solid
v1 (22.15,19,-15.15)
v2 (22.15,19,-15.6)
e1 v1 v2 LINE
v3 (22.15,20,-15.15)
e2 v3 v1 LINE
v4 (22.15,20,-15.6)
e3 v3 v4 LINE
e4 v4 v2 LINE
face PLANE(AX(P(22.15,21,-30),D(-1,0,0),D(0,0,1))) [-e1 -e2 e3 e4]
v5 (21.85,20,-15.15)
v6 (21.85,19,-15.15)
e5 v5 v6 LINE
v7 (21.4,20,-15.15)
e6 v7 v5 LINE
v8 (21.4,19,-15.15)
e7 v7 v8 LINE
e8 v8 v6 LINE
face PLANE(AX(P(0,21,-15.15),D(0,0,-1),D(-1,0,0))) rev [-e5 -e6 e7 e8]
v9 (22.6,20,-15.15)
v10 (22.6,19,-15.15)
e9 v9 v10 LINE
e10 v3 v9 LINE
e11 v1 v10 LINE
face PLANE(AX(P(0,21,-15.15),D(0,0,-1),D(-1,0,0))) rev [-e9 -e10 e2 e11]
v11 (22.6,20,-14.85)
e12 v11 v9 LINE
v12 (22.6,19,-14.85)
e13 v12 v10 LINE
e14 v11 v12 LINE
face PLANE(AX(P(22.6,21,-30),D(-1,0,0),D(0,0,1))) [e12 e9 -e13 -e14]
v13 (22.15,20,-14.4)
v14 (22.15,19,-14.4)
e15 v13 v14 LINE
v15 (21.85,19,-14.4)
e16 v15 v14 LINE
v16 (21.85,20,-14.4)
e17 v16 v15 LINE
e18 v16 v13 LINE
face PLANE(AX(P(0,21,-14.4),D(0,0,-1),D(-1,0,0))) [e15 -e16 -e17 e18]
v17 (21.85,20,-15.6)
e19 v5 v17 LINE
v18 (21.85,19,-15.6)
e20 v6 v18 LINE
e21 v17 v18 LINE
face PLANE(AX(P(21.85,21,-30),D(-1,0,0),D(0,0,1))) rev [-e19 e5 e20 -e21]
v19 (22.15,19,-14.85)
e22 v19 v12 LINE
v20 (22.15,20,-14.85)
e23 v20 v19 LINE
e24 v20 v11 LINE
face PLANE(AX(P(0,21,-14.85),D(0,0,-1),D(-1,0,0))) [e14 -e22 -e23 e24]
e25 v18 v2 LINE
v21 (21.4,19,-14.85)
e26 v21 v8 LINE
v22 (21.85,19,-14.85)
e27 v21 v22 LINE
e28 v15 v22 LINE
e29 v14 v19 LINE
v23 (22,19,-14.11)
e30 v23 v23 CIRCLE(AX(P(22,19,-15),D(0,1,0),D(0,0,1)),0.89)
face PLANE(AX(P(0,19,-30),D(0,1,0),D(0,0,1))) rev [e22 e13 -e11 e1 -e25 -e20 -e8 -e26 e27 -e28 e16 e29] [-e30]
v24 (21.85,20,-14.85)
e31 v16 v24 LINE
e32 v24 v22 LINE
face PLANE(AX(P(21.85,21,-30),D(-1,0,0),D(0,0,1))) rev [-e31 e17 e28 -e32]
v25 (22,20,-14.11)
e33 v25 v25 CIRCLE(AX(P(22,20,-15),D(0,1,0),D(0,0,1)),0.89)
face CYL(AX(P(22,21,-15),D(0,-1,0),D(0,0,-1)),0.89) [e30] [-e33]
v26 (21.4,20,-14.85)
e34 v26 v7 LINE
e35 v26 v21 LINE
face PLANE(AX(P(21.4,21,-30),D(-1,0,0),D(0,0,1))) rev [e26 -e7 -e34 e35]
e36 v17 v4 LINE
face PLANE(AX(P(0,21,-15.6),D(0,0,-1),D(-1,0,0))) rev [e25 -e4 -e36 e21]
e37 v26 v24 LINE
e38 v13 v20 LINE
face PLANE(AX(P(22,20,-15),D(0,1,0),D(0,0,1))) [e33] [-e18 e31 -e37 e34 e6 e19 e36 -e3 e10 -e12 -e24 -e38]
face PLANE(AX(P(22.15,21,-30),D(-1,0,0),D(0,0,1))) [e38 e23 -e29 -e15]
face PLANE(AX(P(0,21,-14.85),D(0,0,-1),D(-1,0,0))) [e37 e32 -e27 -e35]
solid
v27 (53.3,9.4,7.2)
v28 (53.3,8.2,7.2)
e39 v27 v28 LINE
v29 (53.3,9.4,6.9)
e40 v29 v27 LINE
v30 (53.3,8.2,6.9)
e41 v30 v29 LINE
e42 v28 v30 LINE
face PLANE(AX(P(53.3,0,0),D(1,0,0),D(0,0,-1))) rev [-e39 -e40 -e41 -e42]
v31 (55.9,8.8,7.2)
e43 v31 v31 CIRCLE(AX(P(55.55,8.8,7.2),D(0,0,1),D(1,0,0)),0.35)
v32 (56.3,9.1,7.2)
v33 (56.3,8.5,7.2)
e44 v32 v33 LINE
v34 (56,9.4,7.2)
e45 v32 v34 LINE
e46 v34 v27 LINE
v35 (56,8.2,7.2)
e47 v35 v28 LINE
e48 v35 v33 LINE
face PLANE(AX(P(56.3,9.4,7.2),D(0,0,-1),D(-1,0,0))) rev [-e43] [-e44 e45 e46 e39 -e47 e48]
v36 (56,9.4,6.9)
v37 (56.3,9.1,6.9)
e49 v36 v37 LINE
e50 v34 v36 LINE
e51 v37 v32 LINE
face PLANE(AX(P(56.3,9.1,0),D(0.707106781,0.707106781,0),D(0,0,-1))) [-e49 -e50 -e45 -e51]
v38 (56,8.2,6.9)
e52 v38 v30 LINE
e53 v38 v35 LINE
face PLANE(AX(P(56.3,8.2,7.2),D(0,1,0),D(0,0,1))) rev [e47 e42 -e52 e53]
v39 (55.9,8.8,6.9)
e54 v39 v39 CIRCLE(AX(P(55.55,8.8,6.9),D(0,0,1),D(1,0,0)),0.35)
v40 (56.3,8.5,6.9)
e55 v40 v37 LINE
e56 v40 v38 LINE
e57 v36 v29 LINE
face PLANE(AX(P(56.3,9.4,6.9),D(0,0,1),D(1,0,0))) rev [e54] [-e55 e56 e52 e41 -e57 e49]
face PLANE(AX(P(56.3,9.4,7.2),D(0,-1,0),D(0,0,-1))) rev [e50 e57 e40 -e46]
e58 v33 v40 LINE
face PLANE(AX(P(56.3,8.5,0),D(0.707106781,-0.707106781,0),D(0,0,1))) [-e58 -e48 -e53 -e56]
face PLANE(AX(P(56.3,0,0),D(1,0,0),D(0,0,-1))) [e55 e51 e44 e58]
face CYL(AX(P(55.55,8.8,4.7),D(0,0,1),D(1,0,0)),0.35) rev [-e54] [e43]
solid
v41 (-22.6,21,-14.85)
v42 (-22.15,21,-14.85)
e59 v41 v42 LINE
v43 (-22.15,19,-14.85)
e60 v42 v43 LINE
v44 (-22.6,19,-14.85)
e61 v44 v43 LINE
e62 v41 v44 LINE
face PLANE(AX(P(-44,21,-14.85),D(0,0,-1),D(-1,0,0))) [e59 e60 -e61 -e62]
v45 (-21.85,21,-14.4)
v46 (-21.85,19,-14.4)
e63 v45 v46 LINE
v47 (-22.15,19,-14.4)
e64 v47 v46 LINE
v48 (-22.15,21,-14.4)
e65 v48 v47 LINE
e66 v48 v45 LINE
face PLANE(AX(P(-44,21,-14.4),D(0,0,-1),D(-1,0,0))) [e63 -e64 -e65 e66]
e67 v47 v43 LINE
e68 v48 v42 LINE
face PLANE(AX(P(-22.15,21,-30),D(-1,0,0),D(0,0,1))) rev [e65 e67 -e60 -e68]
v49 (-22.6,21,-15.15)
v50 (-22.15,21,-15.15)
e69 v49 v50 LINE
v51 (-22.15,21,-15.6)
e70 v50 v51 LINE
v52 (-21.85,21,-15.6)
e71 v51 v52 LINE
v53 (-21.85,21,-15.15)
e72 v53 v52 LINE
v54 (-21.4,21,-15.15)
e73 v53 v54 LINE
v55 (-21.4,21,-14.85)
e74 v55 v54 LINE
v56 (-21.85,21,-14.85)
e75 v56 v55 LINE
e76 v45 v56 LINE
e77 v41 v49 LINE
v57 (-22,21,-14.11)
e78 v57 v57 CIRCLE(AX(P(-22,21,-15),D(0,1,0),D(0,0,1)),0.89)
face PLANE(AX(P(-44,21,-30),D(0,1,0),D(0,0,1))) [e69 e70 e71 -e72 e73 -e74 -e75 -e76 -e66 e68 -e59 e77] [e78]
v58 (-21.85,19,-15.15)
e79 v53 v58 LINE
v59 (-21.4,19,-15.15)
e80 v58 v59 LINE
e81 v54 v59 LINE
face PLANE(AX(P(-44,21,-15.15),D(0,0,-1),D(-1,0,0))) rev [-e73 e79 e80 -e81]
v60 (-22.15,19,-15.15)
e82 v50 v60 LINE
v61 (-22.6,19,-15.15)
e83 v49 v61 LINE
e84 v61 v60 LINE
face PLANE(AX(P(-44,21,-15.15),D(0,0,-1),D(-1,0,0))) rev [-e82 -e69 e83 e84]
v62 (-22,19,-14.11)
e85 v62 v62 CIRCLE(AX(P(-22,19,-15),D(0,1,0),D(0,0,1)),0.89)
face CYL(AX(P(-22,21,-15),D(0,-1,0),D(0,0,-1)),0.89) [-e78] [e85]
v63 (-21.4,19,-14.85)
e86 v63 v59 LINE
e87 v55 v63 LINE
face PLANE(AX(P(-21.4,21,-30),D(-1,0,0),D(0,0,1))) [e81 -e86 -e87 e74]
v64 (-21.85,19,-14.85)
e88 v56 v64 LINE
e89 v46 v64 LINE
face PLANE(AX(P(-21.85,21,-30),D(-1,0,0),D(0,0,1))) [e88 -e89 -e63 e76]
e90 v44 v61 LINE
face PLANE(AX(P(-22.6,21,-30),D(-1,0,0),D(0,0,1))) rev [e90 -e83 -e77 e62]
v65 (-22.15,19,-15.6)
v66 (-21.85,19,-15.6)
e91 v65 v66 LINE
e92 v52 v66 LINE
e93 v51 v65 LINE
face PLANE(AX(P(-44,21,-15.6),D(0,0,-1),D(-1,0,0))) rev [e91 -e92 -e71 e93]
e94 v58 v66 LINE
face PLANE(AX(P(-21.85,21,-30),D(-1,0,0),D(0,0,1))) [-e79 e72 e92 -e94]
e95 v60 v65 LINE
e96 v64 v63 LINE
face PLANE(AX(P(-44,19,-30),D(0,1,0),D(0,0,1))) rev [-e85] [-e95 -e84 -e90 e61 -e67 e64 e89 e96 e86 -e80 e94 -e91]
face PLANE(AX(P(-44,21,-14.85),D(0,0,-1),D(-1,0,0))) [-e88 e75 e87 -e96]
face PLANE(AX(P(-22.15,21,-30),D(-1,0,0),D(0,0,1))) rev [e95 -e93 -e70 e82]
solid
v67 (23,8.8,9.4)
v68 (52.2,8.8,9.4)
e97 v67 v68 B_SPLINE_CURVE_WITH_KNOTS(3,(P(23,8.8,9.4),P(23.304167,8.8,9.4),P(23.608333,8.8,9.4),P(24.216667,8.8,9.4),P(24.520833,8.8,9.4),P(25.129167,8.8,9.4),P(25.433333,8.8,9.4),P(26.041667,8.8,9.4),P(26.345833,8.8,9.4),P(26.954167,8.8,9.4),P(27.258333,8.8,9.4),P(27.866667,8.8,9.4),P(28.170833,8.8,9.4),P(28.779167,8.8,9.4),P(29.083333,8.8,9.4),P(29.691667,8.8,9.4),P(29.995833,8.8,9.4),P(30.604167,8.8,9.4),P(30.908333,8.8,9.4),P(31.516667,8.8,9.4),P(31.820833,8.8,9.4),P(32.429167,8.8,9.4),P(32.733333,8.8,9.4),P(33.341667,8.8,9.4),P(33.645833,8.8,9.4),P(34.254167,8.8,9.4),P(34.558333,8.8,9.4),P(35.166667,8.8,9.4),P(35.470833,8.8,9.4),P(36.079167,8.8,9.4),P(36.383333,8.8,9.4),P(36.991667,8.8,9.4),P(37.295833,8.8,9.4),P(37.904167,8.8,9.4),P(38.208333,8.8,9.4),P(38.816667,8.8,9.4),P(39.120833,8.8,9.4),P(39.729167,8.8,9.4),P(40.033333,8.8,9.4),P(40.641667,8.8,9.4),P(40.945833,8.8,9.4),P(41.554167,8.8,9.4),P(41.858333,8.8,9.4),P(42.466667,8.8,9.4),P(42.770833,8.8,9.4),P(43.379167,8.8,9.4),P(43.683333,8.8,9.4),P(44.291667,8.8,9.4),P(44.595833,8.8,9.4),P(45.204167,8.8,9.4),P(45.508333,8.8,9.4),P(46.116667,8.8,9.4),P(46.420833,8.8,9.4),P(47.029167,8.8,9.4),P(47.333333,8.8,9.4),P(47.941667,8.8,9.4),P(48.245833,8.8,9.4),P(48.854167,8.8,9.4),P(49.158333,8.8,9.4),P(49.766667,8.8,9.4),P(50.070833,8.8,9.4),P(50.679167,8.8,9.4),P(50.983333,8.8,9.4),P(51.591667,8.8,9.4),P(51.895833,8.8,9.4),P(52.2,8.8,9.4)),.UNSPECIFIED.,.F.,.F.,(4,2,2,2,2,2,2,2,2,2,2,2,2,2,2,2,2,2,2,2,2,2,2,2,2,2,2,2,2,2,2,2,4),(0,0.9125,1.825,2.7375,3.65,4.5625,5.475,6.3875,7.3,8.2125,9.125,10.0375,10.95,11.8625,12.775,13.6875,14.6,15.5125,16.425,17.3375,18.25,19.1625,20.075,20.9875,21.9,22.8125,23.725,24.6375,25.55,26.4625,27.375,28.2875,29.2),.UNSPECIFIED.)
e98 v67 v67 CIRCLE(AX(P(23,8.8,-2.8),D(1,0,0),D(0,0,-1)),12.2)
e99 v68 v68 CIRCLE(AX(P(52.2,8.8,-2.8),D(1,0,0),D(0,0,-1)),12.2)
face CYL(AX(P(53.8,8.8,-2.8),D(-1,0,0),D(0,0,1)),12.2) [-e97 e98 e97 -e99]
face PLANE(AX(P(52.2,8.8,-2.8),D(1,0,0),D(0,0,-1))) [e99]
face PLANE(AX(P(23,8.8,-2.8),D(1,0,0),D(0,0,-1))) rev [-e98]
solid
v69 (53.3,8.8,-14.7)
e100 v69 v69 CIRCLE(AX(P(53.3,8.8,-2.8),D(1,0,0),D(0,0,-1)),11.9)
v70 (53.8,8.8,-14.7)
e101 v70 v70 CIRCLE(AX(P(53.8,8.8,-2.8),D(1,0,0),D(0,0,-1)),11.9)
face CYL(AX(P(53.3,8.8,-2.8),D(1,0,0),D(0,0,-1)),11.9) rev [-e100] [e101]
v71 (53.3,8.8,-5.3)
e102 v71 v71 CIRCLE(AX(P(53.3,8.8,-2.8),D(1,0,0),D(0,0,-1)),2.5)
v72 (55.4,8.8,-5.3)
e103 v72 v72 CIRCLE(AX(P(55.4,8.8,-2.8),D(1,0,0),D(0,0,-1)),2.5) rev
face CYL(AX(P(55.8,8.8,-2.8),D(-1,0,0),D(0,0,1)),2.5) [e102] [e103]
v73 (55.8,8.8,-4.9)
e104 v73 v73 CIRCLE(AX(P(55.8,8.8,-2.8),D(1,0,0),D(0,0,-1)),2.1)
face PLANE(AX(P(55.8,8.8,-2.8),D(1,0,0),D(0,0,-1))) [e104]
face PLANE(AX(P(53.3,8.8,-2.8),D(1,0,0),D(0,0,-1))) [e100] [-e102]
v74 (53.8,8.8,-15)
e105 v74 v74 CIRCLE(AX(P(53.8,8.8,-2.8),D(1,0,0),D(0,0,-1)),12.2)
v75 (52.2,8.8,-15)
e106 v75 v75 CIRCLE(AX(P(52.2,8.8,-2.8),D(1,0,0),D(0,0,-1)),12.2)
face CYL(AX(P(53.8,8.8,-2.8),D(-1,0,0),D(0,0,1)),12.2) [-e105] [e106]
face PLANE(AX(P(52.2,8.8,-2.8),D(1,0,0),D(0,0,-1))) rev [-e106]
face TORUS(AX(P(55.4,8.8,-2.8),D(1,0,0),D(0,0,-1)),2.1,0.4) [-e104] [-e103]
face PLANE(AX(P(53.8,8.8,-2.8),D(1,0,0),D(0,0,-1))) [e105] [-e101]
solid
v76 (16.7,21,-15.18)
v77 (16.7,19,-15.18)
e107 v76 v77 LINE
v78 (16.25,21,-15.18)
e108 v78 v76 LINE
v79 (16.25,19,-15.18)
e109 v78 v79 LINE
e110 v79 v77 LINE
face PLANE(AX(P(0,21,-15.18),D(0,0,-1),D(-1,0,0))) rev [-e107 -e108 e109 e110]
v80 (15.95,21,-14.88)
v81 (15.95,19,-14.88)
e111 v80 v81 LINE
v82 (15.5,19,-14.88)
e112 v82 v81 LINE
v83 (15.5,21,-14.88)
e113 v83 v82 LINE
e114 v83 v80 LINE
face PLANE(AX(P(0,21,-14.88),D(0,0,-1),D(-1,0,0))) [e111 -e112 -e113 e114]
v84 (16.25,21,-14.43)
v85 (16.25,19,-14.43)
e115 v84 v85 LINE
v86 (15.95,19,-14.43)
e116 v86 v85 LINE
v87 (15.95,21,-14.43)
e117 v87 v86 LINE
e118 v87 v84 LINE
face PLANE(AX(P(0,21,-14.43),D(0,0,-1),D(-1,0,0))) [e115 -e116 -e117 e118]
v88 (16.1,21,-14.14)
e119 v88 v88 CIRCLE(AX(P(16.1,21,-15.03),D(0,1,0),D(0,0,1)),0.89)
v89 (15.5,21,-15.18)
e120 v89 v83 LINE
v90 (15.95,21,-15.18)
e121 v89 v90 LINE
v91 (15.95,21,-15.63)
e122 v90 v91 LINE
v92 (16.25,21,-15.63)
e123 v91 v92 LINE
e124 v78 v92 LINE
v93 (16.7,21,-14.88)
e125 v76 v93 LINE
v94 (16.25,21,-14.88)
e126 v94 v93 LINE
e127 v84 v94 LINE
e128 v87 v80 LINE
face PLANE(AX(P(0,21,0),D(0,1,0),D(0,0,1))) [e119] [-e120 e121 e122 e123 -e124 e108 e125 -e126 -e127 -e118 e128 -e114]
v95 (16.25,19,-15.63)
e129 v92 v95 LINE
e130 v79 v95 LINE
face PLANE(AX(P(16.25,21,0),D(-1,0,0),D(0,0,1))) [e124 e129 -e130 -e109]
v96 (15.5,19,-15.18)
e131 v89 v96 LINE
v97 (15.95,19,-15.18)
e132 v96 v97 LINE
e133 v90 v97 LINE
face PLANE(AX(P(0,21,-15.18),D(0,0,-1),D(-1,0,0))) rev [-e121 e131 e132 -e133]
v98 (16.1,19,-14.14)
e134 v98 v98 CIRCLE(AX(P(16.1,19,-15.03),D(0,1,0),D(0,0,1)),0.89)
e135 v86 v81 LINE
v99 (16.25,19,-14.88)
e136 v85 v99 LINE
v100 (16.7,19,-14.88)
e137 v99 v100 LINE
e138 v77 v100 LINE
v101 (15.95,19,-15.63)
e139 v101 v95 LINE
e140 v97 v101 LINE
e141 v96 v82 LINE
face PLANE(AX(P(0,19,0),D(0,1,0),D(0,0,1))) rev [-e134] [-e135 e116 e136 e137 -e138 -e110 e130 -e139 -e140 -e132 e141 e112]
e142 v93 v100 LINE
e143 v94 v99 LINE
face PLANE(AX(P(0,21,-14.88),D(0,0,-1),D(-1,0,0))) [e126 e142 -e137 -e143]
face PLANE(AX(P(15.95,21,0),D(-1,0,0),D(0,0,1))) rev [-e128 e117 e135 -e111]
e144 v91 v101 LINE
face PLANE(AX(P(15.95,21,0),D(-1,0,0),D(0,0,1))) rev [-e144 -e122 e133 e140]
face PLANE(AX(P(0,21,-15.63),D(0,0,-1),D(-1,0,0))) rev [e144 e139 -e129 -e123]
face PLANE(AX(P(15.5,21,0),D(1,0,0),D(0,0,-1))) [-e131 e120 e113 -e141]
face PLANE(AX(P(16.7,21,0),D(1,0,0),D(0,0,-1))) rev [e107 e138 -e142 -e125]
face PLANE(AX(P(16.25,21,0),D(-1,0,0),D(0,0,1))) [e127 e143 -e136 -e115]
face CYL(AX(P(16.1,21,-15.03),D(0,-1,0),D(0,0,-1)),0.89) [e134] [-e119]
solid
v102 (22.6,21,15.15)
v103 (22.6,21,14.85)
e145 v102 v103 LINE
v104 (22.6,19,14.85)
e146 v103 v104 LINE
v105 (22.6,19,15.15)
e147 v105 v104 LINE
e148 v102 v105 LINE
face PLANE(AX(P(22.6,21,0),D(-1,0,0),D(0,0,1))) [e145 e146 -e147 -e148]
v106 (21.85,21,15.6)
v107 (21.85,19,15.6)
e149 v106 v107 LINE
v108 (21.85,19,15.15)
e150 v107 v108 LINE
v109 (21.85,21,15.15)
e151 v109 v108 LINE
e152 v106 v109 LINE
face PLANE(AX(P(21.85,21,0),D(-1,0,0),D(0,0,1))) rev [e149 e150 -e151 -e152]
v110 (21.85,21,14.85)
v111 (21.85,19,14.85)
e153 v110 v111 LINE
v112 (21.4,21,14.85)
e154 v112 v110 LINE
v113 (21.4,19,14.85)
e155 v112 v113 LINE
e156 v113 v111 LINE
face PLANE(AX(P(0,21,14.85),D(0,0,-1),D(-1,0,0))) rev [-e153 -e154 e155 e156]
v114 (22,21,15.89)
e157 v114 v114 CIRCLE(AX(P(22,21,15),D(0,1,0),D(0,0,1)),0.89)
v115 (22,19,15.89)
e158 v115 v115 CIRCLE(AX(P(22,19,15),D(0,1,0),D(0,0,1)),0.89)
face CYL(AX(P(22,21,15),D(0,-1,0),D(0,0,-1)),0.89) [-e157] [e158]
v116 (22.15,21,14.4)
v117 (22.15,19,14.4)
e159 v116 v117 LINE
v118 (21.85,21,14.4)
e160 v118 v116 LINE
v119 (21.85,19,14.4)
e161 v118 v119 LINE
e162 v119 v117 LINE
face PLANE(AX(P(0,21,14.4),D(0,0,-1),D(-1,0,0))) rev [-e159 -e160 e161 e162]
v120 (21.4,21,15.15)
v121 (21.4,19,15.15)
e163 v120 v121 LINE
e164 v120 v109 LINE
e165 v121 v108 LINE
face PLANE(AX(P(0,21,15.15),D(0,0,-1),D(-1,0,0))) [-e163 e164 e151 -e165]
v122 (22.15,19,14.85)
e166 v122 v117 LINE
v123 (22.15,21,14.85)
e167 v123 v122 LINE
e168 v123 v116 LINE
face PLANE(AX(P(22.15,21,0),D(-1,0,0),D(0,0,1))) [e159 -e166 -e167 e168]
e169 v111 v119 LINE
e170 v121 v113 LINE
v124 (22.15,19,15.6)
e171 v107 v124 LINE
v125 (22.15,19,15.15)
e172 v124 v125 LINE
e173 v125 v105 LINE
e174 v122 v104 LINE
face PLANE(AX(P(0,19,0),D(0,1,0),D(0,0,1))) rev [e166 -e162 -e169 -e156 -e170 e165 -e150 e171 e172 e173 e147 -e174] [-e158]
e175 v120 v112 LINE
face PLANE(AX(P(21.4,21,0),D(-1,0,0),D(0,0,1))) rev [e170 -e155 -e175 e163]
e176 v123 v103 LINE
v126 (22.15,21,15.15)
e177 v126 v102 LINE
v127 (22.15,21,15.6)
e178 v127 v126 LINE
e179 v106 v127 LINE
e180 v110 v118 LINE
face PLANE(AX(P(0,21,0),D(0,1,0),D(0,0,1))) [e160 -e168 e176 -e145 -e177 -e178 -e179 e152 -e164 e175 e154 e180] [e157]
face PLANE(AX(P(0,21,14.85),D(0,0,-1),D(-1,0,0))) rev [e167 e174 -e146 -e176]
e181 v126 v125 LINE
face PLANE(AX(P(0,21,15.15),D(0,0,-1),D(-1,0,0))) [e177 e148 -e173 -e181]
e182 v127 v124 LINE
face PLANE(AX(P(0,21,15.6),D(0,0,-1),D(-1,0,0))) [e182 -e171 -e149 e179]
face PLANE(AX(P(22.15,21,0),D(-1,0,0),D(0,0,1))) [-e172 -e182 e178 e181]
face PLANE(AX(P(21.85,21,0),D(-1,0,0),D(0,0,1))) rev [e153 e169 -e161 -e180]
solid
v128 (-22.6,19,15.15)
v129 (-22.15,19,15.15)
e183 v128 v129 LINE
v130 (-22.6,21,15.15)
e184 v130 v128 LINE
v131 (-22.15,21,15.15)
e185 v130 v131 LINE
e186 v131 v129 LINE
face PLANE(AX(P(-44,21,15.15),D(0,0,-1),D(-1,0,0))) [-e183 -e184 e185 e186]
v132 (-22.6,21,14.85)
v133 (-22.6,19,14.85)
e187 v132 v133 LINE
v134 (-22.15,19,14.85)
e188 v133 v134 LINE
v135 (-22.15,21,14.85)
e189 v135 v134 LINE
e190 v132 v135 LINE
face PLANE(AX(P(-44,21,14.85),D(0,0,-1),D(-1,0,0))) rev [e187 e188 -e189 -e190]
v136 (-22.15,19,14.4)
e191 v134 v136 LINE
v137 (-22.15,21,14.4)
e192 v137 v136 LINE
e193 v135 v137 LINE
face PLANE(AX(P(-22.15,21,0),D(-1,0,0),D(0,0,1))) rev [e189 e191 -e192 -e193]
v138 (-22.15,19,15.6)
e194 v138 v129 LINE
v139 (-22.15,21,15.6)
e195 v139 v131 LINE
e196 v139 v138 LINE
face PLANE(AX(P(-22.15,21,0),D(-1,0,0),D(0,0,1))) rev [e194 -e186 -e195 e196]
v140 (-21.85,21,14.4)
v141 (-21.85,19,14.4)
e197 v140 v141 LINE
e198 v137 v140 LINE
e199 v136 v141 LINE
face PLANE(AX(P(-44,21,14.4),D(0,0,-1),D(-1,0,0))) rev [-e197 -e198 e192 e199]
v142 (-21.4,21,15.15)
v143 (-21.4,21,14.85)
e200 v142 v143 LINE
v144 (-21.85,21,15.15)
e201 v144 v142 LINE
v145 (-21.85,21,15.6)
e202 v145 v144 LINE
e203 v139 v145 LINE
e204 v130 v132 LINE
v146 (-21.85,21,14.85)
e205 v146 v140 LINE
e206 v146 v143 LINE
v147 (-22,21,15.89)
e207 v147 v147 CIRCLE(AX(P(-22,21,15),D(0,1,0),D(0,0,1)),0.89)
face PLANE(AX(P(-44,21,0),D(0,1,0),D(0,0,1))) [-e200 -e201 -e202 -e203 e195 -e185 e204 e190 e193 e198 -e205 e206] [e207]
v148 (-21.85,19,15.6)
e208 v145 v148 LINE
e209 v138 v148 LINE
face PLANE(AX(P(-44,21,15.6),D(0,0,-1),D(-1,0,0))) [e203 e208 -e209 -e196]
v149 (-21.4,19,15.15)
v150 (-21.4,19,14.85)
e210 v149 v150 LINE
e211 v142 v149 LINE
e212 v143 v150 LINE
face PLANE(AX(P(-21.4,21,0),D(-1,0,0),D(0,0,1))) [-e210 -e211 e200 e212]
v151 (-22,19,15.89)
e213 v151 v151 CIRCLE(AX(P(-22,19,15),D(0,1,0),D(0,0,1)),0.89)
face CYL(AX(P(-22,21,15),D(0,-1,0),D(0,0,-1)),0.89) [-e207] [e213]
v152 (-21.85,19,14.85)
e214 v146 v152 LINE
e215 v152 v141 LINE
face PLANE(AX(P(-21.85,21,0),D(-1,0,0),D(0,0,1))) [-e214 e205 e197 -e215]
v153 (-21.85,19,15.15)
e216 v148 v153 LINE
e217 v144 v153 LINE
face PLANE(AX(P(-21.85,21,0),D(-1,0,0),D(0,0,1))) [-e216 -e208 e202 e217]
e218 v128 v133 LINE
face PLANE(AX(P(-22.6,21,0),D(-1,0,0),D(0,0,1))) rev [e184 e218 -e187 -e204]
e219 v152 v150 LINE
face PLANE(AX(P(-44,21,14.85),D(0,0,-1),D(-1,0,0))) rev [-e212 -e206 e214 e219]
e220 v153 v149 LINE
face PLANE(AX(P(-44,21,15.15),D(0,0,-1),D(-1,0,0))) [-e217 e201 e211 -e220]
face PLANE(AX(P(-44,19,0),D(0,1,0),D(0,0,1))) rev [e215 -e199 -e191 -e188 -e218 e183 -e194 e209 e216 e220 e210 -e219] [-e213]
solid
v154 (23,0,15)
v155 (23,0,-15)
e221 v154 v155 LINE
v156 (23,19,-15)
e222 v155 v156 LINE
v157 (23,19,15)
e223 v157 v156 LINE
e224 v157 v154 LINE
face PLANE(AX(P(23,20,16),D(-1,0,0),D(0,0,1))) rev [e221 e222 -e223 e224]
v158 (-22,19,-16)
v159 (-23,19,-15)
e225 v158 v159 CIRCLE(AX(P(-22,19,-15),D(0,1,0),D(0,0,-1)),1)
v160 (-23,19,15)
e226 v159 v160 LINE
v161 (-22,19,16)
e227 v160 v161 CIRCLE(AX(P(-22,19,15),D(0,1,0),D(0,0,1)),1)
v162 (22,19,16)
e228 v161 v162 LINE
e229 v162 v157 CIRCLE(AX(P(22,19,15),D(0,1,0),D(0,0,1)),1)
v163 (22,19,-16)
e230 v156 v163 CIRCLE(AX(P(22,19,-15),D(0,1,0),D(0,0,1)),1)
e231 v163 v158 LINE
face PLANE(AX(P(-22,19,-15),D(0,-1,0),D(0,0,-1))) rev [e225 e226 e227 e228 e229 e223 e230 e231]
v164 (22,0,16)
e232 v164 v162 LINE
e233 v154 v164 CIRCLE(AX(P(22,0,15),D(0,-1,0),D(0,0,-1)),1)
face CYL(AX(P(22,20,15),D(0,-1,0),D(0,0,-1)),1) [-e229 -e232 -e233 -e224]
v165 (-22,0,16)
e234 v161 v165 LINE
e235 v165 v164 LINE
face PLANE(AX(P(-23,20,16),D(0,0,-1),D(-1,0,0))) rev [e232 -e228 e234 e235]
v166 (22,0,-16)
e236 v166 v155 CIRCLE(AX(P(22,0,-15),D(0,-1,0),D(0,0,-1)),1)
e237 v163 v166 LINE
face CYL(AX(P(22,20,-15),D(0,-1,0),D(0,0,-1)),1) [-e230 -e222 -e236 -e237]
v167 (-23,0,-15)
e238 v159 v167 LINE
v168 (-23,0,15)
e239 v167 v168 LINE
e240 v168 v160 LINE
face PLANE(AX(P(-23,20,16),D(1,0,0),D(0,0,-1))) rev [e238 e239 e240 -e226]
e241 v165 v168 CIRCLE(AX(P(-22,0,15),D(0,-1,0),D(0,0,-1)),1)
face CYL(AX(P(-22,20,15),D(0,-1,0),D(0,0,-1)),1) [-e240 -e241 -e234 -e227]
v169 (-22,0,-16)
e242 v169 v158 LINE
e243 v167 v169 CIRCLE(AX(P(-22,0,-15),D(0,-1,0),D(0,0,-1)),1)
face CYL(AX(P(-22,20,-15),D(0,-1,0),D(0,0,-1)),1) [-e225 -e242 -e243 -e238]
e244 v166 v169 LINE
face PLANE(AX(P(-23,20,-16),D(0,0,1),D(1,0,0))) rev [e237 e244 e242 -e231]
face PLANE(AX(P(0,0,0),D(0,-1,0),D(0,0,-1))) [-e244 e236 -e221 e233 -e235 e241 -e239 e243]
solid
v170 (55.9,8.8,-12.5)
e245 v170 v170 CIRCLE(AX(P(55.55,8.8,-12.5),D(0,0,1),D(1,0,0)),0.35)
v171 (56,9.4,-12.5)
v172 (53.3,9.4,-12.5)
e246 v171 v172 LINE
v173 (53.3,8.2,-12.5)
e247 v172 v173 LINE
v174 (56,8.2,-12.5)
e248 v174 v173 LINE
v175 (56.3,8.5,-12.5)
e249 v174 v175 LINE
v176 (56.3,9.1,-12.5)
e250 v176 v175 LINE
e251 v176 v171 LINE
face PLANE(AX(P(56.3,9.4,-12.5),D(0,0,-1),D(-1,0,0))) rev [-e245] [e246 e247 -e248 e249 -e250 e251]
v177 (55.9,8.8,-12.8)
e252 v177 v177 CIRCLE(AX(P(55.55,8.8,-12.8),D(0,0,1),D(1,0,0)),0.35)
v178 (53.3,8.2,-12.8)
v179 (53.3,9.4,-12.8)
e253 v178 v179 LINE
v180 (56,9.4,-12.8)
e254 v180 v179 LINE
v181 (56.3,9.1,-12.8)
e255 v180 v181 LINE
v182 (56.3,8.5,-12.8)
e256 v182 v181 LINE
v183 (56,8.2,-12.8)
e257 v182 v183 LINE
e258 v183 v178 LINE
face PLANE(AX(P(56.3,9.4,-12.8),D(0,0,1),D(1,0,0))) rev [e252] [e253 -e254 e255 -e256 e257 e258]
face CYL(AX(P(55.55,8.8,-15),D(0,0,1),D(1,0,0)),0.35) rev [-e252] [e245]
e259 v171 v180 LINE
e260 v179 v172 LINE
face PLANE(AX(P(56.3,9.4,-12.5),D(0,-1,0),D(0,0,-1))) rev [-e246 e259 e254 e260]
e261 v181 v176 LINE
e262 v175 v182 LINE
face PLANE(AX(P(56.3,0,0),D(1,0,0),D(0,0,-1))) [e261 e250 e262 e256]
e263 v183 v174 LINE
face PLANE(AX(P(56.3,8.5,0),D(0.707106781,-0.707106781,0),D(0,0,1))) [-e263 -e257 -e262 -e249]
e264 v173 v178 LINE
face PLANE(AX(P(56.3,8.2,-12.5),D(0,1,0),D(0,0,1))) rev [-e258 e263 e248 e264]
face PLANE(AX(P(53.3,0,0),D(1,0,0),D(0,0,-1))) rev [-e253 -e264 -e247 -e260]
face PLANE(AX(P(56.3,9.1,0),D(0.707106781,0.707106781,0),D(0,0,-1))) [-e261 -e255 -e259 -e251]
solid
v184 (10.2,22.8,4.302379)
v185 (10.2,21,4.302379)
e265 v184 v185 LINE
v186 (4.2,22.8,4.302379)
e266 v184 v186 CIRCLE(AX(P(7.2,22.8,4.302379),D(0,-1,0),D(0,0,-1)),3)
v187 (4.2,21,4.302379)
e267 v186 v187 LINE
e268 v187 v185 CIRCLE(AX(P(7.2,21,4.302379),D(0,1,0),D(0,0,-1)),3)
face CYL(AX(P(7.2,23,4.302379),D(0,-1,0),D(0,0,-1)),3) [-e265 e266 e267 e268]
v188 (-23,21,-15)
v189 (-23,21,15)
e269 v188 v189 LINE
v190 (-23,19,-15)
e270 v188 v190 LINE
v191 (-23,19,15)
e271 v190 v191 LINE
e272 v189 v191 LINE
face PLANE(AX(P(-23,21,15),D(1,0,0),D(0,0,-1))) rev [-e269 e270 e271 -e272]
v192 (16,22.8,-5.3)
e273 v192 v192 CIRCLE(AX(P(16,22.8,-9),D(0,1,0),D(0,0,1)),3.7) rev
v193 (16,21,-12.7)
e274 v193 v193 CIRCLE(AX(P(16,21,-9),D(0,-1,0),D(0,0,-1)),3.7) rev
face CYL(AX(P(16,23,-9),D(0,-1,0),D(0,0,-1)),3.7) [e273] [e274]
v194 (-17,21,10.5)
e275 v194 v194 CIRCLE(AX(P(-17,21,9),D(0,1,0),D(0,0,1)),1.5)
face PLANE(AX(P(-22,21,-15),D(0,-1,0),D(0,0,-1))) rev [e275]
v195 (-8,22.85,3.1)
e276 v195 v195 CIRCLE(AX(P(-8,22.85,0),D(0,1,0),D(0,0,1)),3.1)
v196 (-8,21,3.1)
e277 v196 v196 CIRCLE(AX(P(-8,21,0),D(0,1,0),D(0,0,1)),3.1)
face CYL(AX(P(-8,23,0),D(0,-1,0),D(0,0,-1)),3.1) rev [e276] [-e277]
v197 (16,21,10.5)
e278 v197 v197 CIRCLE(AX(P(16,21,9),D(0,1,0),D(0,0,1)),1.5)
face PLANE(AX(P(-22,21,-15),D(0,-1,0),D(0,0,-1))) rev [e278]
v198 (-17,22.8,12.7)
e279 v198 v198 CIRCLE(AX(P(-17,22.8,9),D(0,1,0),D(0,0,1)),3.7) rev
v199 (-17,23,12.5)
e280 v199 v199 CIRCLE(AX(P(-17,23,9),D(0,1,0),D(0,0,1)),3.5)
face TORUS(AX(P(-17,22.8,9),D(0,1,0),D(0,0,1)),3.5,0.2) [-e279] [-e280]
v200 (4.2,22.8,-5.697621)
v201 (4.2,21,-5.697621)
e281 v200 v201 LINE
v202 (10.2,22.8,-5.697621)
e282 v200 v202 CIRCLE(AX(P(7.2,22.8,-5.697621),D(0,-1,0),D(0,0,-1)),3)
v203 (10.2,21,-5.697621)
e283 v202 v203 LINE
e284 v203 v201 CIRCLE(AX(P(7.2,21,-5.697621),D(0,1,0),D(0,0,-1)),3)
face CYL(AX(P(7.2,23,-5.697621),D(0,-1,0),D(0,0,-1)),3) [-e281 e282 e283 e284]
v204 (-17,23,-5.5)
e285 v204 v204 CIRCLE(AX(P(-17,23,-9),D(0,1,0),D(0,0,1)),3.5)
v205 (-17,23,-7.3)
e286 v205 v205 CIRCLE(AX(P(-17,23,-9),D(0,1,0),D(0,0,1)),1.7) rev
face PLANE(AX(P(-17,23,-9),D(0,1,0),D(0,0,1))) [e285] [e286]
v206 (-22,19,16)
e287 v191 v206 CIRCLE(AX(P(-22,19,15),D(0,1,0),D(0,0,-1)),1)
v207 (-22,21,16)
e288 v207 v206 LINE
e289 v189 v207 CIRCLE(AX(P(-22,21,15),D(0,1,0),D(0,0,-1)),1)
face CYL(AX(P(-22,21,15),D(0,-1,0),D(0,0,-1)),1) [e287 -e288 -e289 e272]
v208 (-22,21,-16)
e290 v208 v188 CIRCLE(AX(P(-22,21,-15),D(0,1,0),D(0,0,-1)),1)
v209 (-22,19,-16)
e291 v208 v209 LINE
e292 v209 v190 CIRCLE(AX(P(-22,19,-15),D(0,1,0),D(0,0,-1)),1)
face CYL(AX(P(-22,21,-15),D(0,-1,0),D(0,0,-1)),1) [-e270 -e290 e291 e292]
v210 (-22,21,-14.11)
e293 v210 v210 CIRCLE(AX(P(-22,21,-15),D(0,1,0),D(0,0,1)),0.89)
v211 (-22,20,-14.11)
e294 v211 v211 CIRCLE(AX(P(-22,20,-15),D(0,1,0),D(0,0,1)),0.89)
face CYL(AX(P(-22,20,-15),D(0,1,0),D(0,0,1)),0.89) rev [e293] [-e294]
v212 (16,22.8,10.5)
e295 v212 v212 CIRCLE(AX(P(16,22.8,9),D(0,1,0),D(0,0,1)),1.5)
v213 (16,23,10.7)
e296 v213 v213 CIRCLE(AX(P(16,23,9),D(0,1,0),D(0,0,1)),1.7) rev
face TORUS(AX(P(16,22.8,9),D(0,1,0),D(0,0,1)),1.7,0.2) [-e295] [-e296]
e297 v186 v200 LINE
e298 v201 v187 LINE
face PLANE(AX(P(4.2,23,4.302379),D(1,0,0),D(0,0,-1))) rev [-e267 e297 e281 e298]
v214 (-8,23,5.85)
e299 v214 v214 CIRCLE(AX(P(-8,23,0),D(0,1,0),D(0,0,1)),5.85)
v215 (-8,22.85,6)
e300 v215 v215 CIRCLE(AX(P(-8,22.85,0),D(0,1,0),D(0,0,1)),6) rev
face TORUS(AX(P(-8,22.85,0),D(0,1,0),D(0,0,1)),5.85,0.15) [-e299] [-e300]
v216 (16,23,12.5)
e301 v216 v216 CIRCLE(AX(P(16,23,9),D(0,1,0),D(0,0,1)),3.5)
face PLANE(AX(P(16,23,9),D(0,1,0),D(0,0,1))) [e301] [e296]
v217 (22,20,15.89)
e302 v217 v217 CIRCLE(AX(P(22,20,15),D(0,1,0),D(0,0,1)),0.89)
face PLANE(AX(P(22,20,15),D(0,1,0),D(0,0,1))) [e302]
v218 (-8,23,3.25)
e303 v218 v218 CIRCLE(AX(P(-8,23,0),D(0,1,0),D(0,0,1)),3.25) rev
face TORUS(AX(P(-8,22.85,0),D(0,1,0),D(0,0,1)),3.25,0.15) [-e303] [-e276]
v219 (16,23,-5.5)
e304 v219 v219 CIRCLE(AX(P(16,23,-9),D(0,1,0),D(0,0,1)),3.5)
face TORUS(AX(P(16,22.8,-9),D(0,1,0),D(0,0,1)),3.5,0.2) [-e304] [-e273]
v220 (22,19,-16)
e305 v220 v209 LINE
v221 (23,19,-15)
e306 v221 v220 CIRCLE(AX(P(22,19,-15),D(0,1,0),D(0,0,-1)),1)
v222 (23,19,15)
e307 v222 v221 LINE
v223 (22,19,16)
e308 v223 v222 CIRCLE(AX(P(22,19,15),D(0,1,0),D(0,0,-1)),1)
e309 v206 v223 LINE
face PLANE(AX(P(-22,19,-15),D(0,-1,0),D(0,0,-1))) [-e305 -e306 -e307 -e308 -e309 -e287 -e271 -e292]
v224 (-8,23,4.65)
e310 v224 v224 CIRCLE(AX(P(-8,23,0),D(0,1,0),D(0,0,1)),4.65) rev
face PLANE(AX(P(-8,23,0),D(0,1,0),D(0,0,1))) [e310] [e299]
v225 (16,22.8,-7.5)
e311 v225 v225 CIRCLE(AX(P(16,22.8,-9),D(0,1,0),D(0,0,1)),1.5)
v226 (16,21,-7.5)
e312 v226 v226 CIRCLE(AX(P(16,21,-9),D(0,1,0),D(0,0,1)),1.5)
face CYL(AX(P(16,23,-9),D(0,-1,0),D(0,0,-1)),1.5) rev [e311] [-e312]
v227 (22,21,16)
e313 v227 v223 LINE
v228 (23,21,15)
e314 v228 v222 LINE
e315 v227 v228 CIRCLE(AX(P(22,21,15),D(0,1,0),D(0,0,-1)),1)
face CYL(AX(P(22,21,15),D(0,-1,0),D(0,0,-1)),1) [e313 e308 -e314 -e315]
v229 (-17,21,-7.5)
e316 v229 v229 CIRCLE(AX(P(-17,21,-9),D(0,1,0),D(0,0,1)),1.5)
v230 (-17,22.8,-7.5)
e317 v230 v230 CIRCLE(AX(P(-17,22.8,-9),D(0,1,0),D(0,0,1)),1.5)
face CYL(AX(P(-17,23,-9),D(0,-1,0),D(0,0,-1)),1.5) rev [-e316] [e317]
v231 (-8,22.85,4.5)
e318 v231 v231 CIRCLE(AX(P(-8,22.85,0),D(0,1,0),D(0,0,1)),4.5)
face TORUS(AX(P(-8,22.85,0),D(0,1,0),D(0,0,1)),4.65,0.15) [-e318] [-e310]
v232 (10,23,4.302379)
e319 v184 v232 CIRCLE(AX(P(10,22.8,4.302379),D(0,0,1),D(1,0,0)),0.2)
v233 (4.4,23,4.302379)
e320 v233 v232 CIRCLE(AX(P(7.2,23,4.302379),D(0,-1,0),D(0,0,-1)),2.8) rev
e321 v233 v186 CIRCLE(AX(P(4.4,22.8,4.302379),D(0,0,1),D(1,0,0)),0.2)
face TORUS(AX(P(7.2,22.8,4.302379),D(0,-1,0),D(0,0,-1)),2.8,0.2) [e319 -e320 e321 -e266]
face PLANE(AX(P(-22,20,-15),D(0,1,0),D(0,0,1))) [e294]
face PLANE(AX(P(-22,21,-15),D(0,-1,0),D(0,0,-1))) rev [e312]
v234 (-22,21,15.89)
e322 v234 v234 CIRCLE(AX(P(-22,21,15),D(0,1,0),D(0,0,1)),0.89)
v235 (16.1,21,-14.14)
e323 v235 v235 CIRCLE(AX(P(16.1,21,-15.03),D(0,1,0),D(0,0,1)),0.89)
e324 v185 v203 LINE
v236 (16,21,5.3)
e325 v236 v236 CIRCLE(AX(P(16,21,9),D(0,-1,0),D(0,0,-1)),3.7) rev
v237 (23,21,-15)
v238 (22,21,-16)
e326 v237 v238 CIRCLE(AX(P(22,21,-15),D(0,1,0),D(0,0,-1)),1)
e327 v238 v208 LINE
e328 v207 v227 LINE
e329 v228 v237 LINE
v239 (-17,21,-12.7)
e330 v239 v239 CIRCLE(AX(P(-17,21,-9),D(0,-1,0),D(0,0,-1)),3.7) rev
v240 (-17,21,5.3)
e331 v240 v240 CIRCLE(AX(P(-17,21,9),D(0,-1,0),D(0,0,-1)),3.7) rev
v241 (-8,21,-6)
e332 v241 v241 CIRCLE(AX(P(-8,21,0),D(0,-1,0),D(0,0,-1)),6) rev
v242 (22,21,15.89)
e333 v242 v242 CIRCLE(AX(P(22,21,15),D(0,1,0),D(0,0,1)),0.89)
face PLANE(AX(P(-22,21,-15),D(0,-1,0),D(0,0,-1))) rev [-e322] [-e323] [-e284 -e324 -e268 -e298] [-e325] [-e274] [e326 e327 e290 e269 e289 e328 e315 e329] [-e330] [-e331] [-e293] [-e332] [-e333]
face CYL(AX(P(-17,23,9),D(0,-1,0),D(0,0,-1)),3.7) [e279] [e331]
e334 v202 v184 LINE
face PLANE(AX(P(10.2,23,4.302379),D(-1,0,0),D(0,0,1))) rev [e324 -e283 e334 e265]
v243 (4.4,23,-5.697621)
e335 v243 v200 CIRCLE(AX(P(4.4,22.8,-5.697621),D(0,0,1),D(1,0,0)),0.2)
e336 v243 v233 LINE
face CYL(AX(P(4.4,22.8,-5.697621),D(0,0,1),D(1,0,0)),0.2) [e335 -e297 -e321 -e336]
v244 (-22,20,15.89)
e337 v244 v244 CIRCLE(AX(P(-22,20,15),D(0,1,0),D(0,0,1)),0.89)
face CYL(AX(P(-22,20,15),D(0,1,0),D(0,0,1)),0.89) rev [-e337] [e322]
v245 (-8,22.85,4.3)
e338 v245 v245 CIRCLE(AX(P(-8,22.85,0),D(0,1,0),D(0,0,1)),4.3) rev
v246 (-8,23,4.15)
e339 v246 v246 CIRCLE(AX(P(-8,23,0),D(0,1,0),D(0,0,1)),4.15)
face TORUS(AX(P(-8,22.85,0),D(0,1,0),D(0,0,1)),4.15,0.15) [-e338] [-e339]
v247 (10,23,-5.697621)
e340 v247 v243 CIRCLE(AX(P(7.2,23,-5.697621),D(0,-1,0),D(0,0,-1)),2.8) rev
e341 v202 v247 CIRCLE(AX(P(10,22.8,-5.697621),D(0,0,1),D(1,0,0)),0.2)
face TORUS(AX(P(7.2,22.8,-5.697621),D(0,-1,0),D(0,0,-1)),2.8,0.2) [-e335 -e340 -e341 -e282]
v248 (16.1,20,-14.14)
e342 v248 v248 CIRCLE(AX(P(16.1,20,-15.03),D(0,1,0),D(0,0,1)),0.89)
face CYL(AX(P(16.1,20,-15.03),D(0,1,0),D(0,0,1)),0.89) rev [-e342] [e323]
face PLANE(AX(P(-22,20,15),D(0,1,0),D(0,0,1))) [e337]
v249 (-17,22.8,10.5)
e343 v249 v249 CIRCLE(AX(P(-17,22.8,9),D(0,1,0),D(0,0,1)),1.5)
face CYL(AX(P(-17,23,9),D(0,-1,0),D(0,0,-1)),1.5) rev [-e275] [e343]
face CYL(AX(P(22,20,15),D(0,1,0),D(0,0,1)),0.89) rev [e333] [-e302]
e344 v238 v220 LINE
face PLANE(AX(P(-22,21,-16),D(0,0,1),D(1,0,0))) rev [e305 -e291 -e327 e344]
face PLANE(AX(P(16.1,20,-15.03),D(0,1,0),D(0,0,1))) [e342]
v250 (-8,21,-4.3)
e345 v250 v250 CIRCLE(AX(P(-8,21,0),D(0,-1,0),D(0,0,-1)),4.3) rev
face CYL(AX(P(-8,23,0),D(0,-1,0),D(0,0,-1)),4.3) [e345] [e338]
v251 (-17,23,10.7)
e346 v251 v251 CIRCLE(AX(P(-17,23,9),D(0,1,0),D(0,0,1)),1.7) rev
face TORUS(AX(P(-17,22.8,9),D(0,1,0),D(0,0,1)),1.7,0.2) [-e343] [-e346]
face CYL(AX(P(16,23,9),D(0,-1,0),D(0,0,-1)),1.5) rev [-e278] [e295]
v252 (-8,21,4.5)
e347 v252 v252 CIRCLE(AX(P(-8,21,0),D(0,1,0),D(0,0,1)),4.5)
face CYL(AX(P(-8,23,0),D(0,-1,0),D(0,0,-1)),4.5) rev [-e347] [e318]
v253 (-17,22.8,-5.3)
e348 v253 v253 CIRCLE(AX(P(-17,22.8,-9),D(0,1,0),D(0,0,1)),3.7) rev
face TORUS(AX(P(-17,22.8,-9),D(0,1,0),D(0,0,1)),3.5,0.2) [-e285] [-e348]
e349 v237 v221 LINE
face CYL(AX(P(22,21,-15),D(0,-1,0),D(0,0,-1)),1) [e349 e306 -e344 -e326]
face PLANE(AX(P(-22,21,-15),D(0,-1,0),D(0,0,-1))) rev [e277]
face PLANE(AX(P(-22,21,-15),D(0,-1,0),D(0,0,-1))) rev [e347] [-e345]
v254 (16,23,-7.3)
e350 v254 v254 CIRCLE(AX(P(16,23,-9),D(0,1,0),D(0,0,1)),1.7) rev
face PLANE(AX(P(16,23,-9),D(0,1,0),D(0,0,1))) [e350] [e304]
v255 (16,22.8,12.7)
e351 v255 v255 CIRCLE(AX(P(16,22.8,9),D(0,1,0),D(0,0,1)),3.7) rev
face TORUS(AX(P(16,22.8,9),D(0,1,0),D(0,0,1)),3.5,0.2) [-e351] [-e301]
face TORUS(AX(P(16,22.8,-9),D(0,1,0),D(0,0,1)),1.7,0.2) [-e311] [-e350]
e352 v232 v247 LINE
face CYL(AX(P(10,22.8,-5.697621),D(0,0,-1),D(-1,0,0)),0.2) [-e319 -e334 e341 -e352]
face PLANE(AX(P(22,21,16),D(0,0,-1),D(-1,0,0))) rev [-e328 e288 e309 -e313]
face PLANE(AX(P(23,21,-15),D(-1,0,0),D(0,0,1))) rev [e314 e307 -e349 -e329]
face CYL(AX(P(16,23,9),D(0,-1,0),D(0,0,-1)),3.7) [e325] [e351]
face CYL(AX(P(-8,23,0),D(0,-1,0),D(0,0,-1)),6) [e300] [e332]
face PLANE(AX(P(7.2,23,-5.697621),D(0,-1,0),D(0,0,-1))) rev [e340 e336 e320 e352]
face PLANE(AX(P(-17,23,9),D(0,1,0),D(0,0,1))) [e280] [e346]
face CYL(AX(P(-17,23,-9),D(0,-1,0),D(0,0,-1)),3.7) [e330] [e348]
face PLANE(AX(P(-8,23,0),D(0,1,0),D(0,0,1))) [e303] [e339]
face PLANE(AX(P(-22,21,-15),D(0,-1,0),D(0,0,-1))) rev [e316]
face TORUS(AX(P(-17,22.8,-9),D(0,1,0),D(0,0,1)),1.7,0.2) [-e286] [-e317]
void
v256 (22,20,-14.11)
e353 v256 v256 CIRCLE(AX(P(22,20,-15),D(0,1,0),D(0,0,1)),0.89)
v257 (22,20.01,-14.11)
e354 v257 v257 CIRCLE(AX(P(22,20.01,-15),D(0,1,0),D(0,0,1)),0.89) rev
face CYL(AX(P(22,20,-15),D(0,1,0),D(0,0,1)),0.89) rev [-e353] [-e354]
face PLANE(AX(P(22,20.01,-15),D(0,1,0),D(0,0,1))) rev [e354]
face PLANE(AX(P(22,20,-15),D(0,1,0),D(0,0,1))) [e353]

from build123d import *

# Parameters (mm, degrees)
CROQUIS1_W                = 46
CROQUIS1_H                = 32
SALIENTE_EXTRUIR1_DEPTH   = 20
REDONDEO1_R               = 1
CROQUIS2_R                = 12.2
SALIENTE_EXTRUIR2_DEPTH   = 30.8
CORTAR_EXTRUIR1_DEPTH     = 1
SALIENTE_EXTRUIR3_DEPTH   = 2
CROQUIS7_R                = 12.2
CORTAR_EXTRUIR2_DEPTH     = 1.6
CROQUIS8_R                = 12.2
SALIENTE_EXTRUIR4_DEPTH   = 1.6
CROQUIS9_R                = 2.5
SALIENTE_EXTRUIR5_DEPTH   = 2
CROQUIS10_R               = 11.9
CROQUIS10_R_2             = 2.5
CORTAR_EXTRUIR3_DEPTH     = 0.5
CROQUIS11_W               = 0.3
CROQUIS11_H               = 1.2
SALIENTE_EXTRUIR6_DEPTH   = 3
SALIENTE_EXTRUIR6_2_DEPTH = 3
CROQUIS12_R               = 0.35
CORTAR_EXTRUIR4_DEPTH     = 2.5
CROQUIS13_R               = 0.35
CORTAR_EXTRUIR5_DEPTH     = 2.5
REDONDEO2_R               = 0.4
CHAFL_N1_SIZE             = 0.3
CHAFL_N2_SIZE             = 0.3
CROQUIS14_R               = 0.89
CORTAR_EXTRUIR6_DEPTH     = 1
CROQUIS15_R               = 0.89
SALIENTE_EXTRUIR7_DEPTH   = 2
MATRIZL3_START            = 19
MATRIZL3_OUTLINE_R        = 0.89
MATRIZL3_DEPTH            = 2
MATRIZL3_2_OUTLINE_R      = 0.89
MATRIZL3_2_DEPTH          = 2
MATRIZL3_3_OUTLINE_R      = 0.89
MATRIZL3_3_DEPTH          = 2
MATRIZL3_START_2          = 20
MATRIZL3_4_OUTLINE_R      = 0.89
MATRIZL3_4_DEPTH          = 1
CROQUIS17_R               = 0.89
CORTAR_EXTRUIR7_DEPTH     = 1
CROQUIS19_R               = 0.89
SALIENTE_EXTRUIR9_DEPTH   = 0.99
CROQUIS20_R               = 3.7
CROQUIS20_R_2             = 1.5
SALIENTE_EXTRUIR10_DEPTH  = 2
REDONDEO3_R               = 0.2
MATRIZL13_COUNT           = 2
MATRIZL13_PITCH           = 33
MATRIZL13_COUNT_DIR2      = 2
MATRIZL13_PITCH_DIR2      = 18
REDONDEO3_OF_MATRIZL13_R  = 0.2
SALIENTE_EXTRUIR11_DEPTH  = 2
REDONDEO4_R               = 0.2
CROQUIS25_R               = 0.89
CORTAR_EXTRUIR9_DEPTH     = 1
CROQUIS26_R               = 0.89
SALIENTE_EXTRUIR12_DEPTH  = 2
CROQUIS27_R               = 6
CROQUIS27_R_2             = 4.5
SALIENTE_EXTRUIR13_DEPTH  = 2
CROQUIS28_R               = 4.3
CROQUIS28_R_2             = 3.1
SALIENTE_EXTRUIR14_DEPTH  = 2
REDONDEO5_R               = 0.15


# Read off the part's stored shape, not the designer's step: MatrizL3
with BuildPart() as part:
    # Croquis1 → Saliente-Extruir1 (new body)
    with BuildSketch(Plane(origin=(0, 0, 0), x_dir=(1, 0, 0), z_dir=(0, 1, 0))):
        Rectangle(CROQUIS1_W, CROQUIS1_H)
    extrude(amount=SALIENTE_EXTRUIR1_DEPTH)

    # Redondeo1
    redondeo1_edges = [part.edges().sort_by_distance(p)[0] for p in [
        (23, 10, 16),
        (-23, 10, 16),
        (-23, 10, -16),
        (23, 10, -16),
    ]]
    fillet(redondeo1_edges, radius=REDONDEO1_R)

    # Croquis3 → Cortar-Extruir1 (cut)
    with BuildSketch(Plane(origin=(0, 20, 0), x_dir=(1, 0, 0), z_dir=(0, 1, 0))):
        with BuildLine():
            Line((-22, -16), (22, -16))
            ThreePointArc((22, -16), (22.707106781, -15.707106781), (23, -15))
            Line((23, -15), (23, 15))
            ThreePointArc((23, 15), (22.707106781, 15.707106781), (22, 16))
            Line((22, 16), (-22, 16))
            ThreePointArc((-22, 16), (-22.707106781, 15.707106781), (-23, 15))
            Line((-23, 15), (-23, -15))
            ThreePointArc((-23, -15), (-22.707106781, -15.707106781), (-22, -16))
        make_face()
    extrude(amount=-CORTAR_EXTRUIR1_DEPTH, mode=Mode.SUBTRACT)


with BuildPart() as body_2:
    # Croquis2 → Saliente-Extruir2 (new body)
    with BuildSketch(Plane(origin=(23, 0, 0), x_dir=(0, 0, -1), z_dir=(1, 0, 0))):
        with Locations(Location((2.8, 8.8, 0), (0, 0, 180))):
            Circle(CROQUIS2_R)
    extrude(amount=SALIENTE_EXTRUIR2_DEPTH)

    # Croquis7 → Cortar-Extruir2 (cut)
    with BuildSketch(Plane(origin=(53.8, 0, 0), x_dir=(0, 0, -1), z_dir=(1, 0, 0))):
        with Locations(Location((2.8, 8.8, 0), (0, 0, 180))):
            Circle(CROQUIS7_R)
    extrude(amount=-CORTAR_EXTRUIR2_DEPTH, mode=Mode.SUBTRACT)


with BuildPart() as body_3:
    # Croquis5 → Saliente-Extruir3 (new body)
    with BuildSketch(Plane(origin=(0, 19, 0), x_dir=(1, 0, 0), z_dir=(0, 1, 0))):
        with BuildLine():
            Line((-22, 16), (22, 16))
            ThreePointArc((22, 16), (22.707106781, 15.707106781), (23, 15))
            Line((23, 15), (23, -15))
            ThreePointArc((23, -15), (22.707106781, -15.707106781), (22, -16))
            Line((22, -16), (-22, -16))
            ThreePointArc((-22, -16), (-22.707106781, -15.707106781), (-23, -15))
            Line((-23, -15), (-23, 15))
            ThreePointArc((-23, 15), (-22.707106781, 15.707106781), (-22, 16))
        make_face()
    extrude(amount=SALIENTE_EXTRUIR3_DEPTH)

    # Croquis14 → Cortar-Extruir6 (cut)
    with BuildSketch(Plane(origin=(0, 21, 0), x_dir=(1, 0, 0), z_dir=(0, 1, 0))):
        with Locations(Location((22, -15, 0), (0, 0, 270))):
            Circle(CROQUIS14_R)
    extrude(amount=-CORTAR_EXTRUIR6_DEPTH, mode=Mode.SUBTRACT)

    # MatrizL3 4 outline → MatrizL3 4 (cut)
    with BuildSketch(Plane(origin=(0, 0, 0), x_dir=(1, 0, 0), z_dir=(0, 1, 0)).offset(MATRIZL3_START_2)):
        with Locations((-22, 15)):
            Circle(MATRIZL3_4_OUTLINE_R)
        with Locations((-22, -15)):
            Circle(MATRIZL3_4_OUTLINE_R)
        with Locations((22, 15)):
            Circle(MATRIZL3_4_OUTLINE_R)
    extrude(amount=MATRIZL3_4_DEPTH, mode=Mode.SUBTRACT)

    # Croquis19 → Saliente-Extruir9 (add)
    with BuildSketch(Plane(origin=(0, 21, 0), x_dir=(1, 0, 0), z_dir=(0, 1, 0))):
        with Locations(Location((22, 15, 0), (0, 0, 270))):
            Circle(CROQUIS19_R)
    extrude(amount=-SALIENTE_EXTRUIR9_DEPTH)

    # Croquis20 → Saliente-Extruir10 (add)
    with BuildSketch(Plane(origin=(0, 21, 0), x_dir=(1, 0, 0), z_dir=(0, 1, 0))):
        with Locations(Location((16, -9, 0), (0, 0, 90))):
            Circle(CROQUIS20_R)
        with Locations(Location((16, -9, 0), (0, 0, 270))):
            Circle(CROQUIS20_R_2, mode=Mode.SUBTRACT)
    saliente_extruir10 = extrude(amount=SALIENTE_EXTRUIR10_DEPTH)

    # Redondeo3
    redondeo3_edges = [body_3.edges().sort_by_distance(p)[0] for p in [
        (16, 23, 12.7),
        (16, 23, 7.5),
    ]]
    fillet(redondeo3_edges, radius=REDONDEO3_R)

    # MatrizL13: Saliente-Extruir10 2 × 2
    with Locations(*[(-i * MATRIZL13_PITCH, 0, -j * MATRIZL13_PITCH_DIR2) for i in range(MATRIZL13_COUNT) for j in range(MATRIZL13_COUNT_DIR2) if (i, j) != (0, 0)]):
        add(saliente_extruir10)

    # Redondeo3 of MatrizL13
    redondeo3_of_matrizl13_edges = [body_3.edges().sort_by_distance(p)[0] for p in [
        (16, 23, -5.3),
        (16, 23, -10.5),
        (-17, 23, 12.7),
        (-17, 23, 7.5),
        (-17, 23, -5.3),
        (-17, 23, -10.5),
    ]]
    fillet(redondeo3_of_matrizl13_edges, radius=REDONDEO3_OF_MATRIZL13_R)

    # Croquis23 → Saliente-Extruir11 (add)
    with BuildSketch(Plane(origin=(0, 21, 0), x_dir=(1, 0, 0), z_dir=(0, 1, 0))):
        with BuildLine():
            Line((10.2, -4.30237879), (10.2, 5.69762121))
            ThreePointArc((10.2, 5.69762121), (7.2, 8.69762121), (4.2, 5.69762121))
            Line((4.2, 5.69762121), (4.2, -4.30237879))
            ThreePointArc((4.2, -4.30237879), (7.2, -7.30237879), (10.2, -4.30237879))
        make_face()
    extrude(amount=SALIENTE_EXTRUIR11_DEPTH)

    # Redondeo4
    redondeo4_edges = [body_3.edges().sort_by_distance(p)[0] for p in [
        (7.2, 23, -8.69762121),
        (4.2, 23, -0.69762121),
        (7.2, 23, 7.30237879),
        (10.2, 23, -0.69762121),
    ]]
    fillet(redondeo4_edges, radius=REDONDEO4_R)

    # Croquis25 → Cortar-Extruir9 (cut)
    with BuildSketch(Plane(origin=(0, 21, 0), x_dir=(1, 0, 0), z_dir=(0, 1, 0))):
        with Locations(Location((16.1, 15.03, 0), (0, 0, 270))):
            Circle(CROQUIS25_R)
    extrude(amount=-CORTAR_EXTRUIR9_DEPTH, mode=Mode.SUBTRACT)

    # Croquis27 → Saliente-Extruir13 (add)
    with BuildSketch(Plane(origin=(0, 21, 0), x_dir=(1, 0, 0), z_dir=(0, 1, 0))):
        with Locations(Location((-8, 0, 0), (0, 0, 90))):
            Circle(CROQUIS27_R)
        with Locations(Location((-8, 0, 0), (0, 0, 270))):
            Circle(CROQUIS27_R_2, mode=Mode.SUBTRACT)
    extrude(amount=SALIENTE_EXTRUIR13_DEPTH)

    # Croquis28 → Saliente-Extruir14 (add)
    with BuildSketch(Plane(origin=(0, 21, 0), x_dir=(1, 0, 0), z_dir=(0, 1, 0))):
        with Locations(Location((-8, 0, 0), (0, 0, 90))):
            Circle(CROQUIS28_R)
        with Locations(Location((-8, 0, 0), (0, 0, 270))):
            Circle(CROQUIS28_R_2, mode=Mode.SUBTRACT)
    extrude(amount=SALIENTE_EXTRUIR14_DEPTH)

    # Redondeo5
    redondeo5_edges = [body_3.edges().sort_by_distance(p)[0] for p in [
        (-8, 23, 6),
        (-8, 23, -4.5),
        (-8, 23, 4.3),
        (-8, 23, -3.1),
    ]]
    fillet(redondeo5_edges, radius=REDONDEO5_R)


with BuildPart() as body_4:
    # Croquis8 → Saliente-Extruir4 (new body)
    with BuildSketch(Plane(origin=(52.2, 0, 0), x_dir=(0, 0, -1), z_dir=(1, 0, 0))):
        with Locations((2.8, 8.8)):
            Circle(CROQUIS8_R)
    extrude(amount=SALIENTE_EXTRUIR4_DEPTH)

    # Croquis9 → Saliente-Extruir5 (add)
    with BuildSketch(Plane(origin=(53.8, 0, 0), x_dir=(0, 0, -1), z_dir=(1, 0, 0))):
        with Locations((2.8, 8.8)):
            Circle(CROQUIS9_R)
    extrude(amount=SALIENTE_EXTRUIR5_DEPTH)

    # Croquis10 → Cortar-Extruir3 (cut)
    with BuildSketch(Plane(origin=(53.8, 0, 0), x_dir=(0, 0, -1), z_dir=(1, 0, 0))):
        with Locations((2.8, 8.8)):
            Circle(CROQUIS10_R)
        with Locations((2.8, 8.8)):
            Circle(CROQUIS10_R_2, mode=Mode.SUBTRACT)
    extrude(amount=-CORTAR_EXTRUIR3_DEPTH, mode=Mode.SUBTRACT)

    # Redondeo2
    redondeo2_edges = [body_4.edges().sort_by_distance(p)[0] for p in [
        (55.8, 8.8, -0.3),
    ]]
    fillet(redondeo2_edges, radius=REDONDEO2_R)


with BuildPart() as body_5:
    # Croquis11 → Saliente-Extruir6 (new body)
    with BuildSketch(Plane(origin=(53.3, 0, 0), x_dir=(0, 0, -1), z_dir=(1, 0, 0))):
        with Locations((12.65, 8.8)):
            Rectangle(CROQUIS11_W, CROQUIS11_H)
    extrude(amount=SALIENTE_EXTRUIR6_DEPTH)

    # Croquis13 → Cortar-Extruir5 (cut)
    with BuildSketch(Plane.XY.offset(-12.5)):
        with Locations((55.55, 8.8)):
            Circle(CROQUIS13_R)
    extrude(amount=-CORTAR_EXTRUIR5_DEPTH, mode=Mode.SUBTRACT)

    # Chaflán1
    chafl_n1_edges = [body_5.edges().sort_by_distance(p)[0] for p in [
        (56.3, 9.4, -12.65),
        (56.3, 8.2, -12.65),
    ]]
    chamfer(chafl_n1_edges, length=CHAFL_N1_SIZE)


with BuildPart() as body_6:
    # Croquis11 → Saliente-Extruir6 2 (new body)
    with BuildSketch(Plane(origin=(53.3, 0, 0), x_dir=(0, 0, -1), z_dir=(1, 0, 0))):
        with Locations((-7.05, 8.8)):
            Rectangle(CROQUIS11_W, CROQUIS11_H)
    extrude(amount=SALIENTE_EXTRUIR6_2_DEPTH)

    # Croquis12 → Cortar-Extruir4 (cut)
    with BuildSketch(Plane.XY.offset(7.2)):
        with Locations((55.55, 8.8)):
            Circle(CROQUIS12_R)
    extrude(amount=-CORTAR_EXTRUIR4_DEPTH, mode=Mode.SUBTRACT)

    # Chaflán2
    chafl_n2_edges = [body_6.edges().sort_by_distance(p)[0] for p in [
        (56.3, 8.2, 7.05),
        (56.3, 9.4, 7.05),
    ]]
    chamfer(chafl_n2_edges, length=CHAFL_N2_SIZE)


with BuildPart() as body_7:
    # Croquis15 → Saliente-Extruir7 (new body)
    with BuildSketch(Plane(origin=(0, 19, 0), x_dir=(1, 0, 0), z_dir=(0, 1, 0))):
        with Locations(Location((22, -15, 0), (0, 0, 270))):
            Circle(CROQUIS15_R)
        Polygon((22.15, -15.6), (21.85, -15.6), (21.85, -15.15), (21.4, -15.15), (21.4, -14.85), (21.85, -14.85), (21.85, -14.4), (22.15, -14.4), (22.15, -14.85), (22.6, -14.85), (22.6, -15.15), (22.15, -15.15), align=None, mode=Mode.SUBTRACT)
    extrude(amount=SALIENTE_EXTRUIR7_DEPTH)


with BuildPart() as body_8:
    # MatrizL3 outline → MatrizL3 (new body)
    with BuildSketch(Plane(origin=(0, 0, 0), x_dir=(1, 0, 0), z_dir=(0, 1, 0)).offset(MATRIZL3_START)):
        with Locations((-22, 15)):
            Circle(MATRIZL3_OUTLINE_R)
        Polygon((-21.85, 15.15), (-21.4, 15.15), (-21.4, 14.85), (-21.85, 14.85), (-21.85, 14.4), (-22.15, 14.4), (-22.15, 14.85), (-22.6, 14.85), (-22.6, 15.15), (-22.15, 15.15), (-22.15, 15.6), (-21.85, 15.6), align=None, mode=Mode.SUBTRACT)
    extrude(amount=MATRIZL3_DEPTH)


with BuildPart() as body_9:
    # MatrizL3 2 outline → MatrizL3 2 (new body)
    with BuildSketch(Plane(origin=(0, 0, 0), x_dir=(1, 0, 0), z_dir=(0, 1, 0)).offset(MATRIZL3_START)):
        with Locations((-22, -15)):
            Circle(MATRIZL3_2_OUTLINE_R)
        Polygon((-21.85, -14.85), (-21.4, -14.85), (-21.4, -15.15), (-21.85, -15.15), (-21.85, -15.6), (-22.15, -15.6), (-22.15, -15.15), (-22.6, -15.15), (-22.6, -14.85), (-22.15, -14.85), (-22.15, -14.4), (-21.85, -14.4), align=None, mode=Mode.SUBTRACT)
    extrude(amount=MATRIZL3_2_DEPTH)


with BuildPart() as body_10:
    # MatrizL3 3 outline → MatrizL3 3 (new body)
    with BuildSketch(Plane(origin=(0, 0, 0), x_dir=(1, 0, 0), z_dir=(0, 1, 0)).offset(MATRIZL3_START)):
        with Locations((22, 15)):
            Circle(MATRIZL3_3_OUTLINE_R)
        Polygon((22.15, 15.15), (22.6, 15.15), (22.6, 14.85), (22.15, 14.85), (22.15, 14.4), (21.85, 14.4), (21.85, 14.85), (21.4, 14.85), (21.4, 15.15), (21.85, 15.15), (21.85, 15.6), (22.15, 15.6), align=None, mode=Mode.SUBTRACT)
    extrude(amount=MATRIZL3_3_DEPTH)

    # Croquis17 → Cortar-Extruir7 (cut)
    with BuildSketch(Plane(origin=(0, 21, 0), x_dir=(1, 0, 0), z_dir=(0, 1, 0))):
        with Locations(Location((22, 15, 0), (0, 0, 270))):
            Circle(CROQUIS17_R)
    extrude(amount=-CORTAR_EXTRUIR7_DEPTH, mode=Mode.SUBTRACT)


with BuildPart() as body_11:
    # Croquis26 → Saliente-Extruir12 (new body)
    with BuildSketch(Plane(origin=(0, 19, 0), x_dir=(1, 0, 0), z_dir=(0, 1, 0))):
        with Locations(Location((16.1, 15.03, 0), (0, 0, 270))):
            Circle(CROQUIS26_R)
        Polygon((16.25, 14.43), (15.95, 14.43), (15.95, 14.88), (15.5, 14.88), (15.5, 15.18), (15.95, 15.18), (15.95, 15.63), (16.25, 15.63), (16.25, 15.18), (16.7, 15.18), (16.7, 14.88), (16.25, 14.88), align=None, mode=Mode.SUBTRACT)
    extrude(amount=SALIENTE_EXTRUIR12_DEPTH)


solid = Compound([part.part, body_2.part, body_3.part, body_4.part, body_5.part, body_6.part, body_7.part, body_8.part, body_9.part, body_10.part, body_11.part])
